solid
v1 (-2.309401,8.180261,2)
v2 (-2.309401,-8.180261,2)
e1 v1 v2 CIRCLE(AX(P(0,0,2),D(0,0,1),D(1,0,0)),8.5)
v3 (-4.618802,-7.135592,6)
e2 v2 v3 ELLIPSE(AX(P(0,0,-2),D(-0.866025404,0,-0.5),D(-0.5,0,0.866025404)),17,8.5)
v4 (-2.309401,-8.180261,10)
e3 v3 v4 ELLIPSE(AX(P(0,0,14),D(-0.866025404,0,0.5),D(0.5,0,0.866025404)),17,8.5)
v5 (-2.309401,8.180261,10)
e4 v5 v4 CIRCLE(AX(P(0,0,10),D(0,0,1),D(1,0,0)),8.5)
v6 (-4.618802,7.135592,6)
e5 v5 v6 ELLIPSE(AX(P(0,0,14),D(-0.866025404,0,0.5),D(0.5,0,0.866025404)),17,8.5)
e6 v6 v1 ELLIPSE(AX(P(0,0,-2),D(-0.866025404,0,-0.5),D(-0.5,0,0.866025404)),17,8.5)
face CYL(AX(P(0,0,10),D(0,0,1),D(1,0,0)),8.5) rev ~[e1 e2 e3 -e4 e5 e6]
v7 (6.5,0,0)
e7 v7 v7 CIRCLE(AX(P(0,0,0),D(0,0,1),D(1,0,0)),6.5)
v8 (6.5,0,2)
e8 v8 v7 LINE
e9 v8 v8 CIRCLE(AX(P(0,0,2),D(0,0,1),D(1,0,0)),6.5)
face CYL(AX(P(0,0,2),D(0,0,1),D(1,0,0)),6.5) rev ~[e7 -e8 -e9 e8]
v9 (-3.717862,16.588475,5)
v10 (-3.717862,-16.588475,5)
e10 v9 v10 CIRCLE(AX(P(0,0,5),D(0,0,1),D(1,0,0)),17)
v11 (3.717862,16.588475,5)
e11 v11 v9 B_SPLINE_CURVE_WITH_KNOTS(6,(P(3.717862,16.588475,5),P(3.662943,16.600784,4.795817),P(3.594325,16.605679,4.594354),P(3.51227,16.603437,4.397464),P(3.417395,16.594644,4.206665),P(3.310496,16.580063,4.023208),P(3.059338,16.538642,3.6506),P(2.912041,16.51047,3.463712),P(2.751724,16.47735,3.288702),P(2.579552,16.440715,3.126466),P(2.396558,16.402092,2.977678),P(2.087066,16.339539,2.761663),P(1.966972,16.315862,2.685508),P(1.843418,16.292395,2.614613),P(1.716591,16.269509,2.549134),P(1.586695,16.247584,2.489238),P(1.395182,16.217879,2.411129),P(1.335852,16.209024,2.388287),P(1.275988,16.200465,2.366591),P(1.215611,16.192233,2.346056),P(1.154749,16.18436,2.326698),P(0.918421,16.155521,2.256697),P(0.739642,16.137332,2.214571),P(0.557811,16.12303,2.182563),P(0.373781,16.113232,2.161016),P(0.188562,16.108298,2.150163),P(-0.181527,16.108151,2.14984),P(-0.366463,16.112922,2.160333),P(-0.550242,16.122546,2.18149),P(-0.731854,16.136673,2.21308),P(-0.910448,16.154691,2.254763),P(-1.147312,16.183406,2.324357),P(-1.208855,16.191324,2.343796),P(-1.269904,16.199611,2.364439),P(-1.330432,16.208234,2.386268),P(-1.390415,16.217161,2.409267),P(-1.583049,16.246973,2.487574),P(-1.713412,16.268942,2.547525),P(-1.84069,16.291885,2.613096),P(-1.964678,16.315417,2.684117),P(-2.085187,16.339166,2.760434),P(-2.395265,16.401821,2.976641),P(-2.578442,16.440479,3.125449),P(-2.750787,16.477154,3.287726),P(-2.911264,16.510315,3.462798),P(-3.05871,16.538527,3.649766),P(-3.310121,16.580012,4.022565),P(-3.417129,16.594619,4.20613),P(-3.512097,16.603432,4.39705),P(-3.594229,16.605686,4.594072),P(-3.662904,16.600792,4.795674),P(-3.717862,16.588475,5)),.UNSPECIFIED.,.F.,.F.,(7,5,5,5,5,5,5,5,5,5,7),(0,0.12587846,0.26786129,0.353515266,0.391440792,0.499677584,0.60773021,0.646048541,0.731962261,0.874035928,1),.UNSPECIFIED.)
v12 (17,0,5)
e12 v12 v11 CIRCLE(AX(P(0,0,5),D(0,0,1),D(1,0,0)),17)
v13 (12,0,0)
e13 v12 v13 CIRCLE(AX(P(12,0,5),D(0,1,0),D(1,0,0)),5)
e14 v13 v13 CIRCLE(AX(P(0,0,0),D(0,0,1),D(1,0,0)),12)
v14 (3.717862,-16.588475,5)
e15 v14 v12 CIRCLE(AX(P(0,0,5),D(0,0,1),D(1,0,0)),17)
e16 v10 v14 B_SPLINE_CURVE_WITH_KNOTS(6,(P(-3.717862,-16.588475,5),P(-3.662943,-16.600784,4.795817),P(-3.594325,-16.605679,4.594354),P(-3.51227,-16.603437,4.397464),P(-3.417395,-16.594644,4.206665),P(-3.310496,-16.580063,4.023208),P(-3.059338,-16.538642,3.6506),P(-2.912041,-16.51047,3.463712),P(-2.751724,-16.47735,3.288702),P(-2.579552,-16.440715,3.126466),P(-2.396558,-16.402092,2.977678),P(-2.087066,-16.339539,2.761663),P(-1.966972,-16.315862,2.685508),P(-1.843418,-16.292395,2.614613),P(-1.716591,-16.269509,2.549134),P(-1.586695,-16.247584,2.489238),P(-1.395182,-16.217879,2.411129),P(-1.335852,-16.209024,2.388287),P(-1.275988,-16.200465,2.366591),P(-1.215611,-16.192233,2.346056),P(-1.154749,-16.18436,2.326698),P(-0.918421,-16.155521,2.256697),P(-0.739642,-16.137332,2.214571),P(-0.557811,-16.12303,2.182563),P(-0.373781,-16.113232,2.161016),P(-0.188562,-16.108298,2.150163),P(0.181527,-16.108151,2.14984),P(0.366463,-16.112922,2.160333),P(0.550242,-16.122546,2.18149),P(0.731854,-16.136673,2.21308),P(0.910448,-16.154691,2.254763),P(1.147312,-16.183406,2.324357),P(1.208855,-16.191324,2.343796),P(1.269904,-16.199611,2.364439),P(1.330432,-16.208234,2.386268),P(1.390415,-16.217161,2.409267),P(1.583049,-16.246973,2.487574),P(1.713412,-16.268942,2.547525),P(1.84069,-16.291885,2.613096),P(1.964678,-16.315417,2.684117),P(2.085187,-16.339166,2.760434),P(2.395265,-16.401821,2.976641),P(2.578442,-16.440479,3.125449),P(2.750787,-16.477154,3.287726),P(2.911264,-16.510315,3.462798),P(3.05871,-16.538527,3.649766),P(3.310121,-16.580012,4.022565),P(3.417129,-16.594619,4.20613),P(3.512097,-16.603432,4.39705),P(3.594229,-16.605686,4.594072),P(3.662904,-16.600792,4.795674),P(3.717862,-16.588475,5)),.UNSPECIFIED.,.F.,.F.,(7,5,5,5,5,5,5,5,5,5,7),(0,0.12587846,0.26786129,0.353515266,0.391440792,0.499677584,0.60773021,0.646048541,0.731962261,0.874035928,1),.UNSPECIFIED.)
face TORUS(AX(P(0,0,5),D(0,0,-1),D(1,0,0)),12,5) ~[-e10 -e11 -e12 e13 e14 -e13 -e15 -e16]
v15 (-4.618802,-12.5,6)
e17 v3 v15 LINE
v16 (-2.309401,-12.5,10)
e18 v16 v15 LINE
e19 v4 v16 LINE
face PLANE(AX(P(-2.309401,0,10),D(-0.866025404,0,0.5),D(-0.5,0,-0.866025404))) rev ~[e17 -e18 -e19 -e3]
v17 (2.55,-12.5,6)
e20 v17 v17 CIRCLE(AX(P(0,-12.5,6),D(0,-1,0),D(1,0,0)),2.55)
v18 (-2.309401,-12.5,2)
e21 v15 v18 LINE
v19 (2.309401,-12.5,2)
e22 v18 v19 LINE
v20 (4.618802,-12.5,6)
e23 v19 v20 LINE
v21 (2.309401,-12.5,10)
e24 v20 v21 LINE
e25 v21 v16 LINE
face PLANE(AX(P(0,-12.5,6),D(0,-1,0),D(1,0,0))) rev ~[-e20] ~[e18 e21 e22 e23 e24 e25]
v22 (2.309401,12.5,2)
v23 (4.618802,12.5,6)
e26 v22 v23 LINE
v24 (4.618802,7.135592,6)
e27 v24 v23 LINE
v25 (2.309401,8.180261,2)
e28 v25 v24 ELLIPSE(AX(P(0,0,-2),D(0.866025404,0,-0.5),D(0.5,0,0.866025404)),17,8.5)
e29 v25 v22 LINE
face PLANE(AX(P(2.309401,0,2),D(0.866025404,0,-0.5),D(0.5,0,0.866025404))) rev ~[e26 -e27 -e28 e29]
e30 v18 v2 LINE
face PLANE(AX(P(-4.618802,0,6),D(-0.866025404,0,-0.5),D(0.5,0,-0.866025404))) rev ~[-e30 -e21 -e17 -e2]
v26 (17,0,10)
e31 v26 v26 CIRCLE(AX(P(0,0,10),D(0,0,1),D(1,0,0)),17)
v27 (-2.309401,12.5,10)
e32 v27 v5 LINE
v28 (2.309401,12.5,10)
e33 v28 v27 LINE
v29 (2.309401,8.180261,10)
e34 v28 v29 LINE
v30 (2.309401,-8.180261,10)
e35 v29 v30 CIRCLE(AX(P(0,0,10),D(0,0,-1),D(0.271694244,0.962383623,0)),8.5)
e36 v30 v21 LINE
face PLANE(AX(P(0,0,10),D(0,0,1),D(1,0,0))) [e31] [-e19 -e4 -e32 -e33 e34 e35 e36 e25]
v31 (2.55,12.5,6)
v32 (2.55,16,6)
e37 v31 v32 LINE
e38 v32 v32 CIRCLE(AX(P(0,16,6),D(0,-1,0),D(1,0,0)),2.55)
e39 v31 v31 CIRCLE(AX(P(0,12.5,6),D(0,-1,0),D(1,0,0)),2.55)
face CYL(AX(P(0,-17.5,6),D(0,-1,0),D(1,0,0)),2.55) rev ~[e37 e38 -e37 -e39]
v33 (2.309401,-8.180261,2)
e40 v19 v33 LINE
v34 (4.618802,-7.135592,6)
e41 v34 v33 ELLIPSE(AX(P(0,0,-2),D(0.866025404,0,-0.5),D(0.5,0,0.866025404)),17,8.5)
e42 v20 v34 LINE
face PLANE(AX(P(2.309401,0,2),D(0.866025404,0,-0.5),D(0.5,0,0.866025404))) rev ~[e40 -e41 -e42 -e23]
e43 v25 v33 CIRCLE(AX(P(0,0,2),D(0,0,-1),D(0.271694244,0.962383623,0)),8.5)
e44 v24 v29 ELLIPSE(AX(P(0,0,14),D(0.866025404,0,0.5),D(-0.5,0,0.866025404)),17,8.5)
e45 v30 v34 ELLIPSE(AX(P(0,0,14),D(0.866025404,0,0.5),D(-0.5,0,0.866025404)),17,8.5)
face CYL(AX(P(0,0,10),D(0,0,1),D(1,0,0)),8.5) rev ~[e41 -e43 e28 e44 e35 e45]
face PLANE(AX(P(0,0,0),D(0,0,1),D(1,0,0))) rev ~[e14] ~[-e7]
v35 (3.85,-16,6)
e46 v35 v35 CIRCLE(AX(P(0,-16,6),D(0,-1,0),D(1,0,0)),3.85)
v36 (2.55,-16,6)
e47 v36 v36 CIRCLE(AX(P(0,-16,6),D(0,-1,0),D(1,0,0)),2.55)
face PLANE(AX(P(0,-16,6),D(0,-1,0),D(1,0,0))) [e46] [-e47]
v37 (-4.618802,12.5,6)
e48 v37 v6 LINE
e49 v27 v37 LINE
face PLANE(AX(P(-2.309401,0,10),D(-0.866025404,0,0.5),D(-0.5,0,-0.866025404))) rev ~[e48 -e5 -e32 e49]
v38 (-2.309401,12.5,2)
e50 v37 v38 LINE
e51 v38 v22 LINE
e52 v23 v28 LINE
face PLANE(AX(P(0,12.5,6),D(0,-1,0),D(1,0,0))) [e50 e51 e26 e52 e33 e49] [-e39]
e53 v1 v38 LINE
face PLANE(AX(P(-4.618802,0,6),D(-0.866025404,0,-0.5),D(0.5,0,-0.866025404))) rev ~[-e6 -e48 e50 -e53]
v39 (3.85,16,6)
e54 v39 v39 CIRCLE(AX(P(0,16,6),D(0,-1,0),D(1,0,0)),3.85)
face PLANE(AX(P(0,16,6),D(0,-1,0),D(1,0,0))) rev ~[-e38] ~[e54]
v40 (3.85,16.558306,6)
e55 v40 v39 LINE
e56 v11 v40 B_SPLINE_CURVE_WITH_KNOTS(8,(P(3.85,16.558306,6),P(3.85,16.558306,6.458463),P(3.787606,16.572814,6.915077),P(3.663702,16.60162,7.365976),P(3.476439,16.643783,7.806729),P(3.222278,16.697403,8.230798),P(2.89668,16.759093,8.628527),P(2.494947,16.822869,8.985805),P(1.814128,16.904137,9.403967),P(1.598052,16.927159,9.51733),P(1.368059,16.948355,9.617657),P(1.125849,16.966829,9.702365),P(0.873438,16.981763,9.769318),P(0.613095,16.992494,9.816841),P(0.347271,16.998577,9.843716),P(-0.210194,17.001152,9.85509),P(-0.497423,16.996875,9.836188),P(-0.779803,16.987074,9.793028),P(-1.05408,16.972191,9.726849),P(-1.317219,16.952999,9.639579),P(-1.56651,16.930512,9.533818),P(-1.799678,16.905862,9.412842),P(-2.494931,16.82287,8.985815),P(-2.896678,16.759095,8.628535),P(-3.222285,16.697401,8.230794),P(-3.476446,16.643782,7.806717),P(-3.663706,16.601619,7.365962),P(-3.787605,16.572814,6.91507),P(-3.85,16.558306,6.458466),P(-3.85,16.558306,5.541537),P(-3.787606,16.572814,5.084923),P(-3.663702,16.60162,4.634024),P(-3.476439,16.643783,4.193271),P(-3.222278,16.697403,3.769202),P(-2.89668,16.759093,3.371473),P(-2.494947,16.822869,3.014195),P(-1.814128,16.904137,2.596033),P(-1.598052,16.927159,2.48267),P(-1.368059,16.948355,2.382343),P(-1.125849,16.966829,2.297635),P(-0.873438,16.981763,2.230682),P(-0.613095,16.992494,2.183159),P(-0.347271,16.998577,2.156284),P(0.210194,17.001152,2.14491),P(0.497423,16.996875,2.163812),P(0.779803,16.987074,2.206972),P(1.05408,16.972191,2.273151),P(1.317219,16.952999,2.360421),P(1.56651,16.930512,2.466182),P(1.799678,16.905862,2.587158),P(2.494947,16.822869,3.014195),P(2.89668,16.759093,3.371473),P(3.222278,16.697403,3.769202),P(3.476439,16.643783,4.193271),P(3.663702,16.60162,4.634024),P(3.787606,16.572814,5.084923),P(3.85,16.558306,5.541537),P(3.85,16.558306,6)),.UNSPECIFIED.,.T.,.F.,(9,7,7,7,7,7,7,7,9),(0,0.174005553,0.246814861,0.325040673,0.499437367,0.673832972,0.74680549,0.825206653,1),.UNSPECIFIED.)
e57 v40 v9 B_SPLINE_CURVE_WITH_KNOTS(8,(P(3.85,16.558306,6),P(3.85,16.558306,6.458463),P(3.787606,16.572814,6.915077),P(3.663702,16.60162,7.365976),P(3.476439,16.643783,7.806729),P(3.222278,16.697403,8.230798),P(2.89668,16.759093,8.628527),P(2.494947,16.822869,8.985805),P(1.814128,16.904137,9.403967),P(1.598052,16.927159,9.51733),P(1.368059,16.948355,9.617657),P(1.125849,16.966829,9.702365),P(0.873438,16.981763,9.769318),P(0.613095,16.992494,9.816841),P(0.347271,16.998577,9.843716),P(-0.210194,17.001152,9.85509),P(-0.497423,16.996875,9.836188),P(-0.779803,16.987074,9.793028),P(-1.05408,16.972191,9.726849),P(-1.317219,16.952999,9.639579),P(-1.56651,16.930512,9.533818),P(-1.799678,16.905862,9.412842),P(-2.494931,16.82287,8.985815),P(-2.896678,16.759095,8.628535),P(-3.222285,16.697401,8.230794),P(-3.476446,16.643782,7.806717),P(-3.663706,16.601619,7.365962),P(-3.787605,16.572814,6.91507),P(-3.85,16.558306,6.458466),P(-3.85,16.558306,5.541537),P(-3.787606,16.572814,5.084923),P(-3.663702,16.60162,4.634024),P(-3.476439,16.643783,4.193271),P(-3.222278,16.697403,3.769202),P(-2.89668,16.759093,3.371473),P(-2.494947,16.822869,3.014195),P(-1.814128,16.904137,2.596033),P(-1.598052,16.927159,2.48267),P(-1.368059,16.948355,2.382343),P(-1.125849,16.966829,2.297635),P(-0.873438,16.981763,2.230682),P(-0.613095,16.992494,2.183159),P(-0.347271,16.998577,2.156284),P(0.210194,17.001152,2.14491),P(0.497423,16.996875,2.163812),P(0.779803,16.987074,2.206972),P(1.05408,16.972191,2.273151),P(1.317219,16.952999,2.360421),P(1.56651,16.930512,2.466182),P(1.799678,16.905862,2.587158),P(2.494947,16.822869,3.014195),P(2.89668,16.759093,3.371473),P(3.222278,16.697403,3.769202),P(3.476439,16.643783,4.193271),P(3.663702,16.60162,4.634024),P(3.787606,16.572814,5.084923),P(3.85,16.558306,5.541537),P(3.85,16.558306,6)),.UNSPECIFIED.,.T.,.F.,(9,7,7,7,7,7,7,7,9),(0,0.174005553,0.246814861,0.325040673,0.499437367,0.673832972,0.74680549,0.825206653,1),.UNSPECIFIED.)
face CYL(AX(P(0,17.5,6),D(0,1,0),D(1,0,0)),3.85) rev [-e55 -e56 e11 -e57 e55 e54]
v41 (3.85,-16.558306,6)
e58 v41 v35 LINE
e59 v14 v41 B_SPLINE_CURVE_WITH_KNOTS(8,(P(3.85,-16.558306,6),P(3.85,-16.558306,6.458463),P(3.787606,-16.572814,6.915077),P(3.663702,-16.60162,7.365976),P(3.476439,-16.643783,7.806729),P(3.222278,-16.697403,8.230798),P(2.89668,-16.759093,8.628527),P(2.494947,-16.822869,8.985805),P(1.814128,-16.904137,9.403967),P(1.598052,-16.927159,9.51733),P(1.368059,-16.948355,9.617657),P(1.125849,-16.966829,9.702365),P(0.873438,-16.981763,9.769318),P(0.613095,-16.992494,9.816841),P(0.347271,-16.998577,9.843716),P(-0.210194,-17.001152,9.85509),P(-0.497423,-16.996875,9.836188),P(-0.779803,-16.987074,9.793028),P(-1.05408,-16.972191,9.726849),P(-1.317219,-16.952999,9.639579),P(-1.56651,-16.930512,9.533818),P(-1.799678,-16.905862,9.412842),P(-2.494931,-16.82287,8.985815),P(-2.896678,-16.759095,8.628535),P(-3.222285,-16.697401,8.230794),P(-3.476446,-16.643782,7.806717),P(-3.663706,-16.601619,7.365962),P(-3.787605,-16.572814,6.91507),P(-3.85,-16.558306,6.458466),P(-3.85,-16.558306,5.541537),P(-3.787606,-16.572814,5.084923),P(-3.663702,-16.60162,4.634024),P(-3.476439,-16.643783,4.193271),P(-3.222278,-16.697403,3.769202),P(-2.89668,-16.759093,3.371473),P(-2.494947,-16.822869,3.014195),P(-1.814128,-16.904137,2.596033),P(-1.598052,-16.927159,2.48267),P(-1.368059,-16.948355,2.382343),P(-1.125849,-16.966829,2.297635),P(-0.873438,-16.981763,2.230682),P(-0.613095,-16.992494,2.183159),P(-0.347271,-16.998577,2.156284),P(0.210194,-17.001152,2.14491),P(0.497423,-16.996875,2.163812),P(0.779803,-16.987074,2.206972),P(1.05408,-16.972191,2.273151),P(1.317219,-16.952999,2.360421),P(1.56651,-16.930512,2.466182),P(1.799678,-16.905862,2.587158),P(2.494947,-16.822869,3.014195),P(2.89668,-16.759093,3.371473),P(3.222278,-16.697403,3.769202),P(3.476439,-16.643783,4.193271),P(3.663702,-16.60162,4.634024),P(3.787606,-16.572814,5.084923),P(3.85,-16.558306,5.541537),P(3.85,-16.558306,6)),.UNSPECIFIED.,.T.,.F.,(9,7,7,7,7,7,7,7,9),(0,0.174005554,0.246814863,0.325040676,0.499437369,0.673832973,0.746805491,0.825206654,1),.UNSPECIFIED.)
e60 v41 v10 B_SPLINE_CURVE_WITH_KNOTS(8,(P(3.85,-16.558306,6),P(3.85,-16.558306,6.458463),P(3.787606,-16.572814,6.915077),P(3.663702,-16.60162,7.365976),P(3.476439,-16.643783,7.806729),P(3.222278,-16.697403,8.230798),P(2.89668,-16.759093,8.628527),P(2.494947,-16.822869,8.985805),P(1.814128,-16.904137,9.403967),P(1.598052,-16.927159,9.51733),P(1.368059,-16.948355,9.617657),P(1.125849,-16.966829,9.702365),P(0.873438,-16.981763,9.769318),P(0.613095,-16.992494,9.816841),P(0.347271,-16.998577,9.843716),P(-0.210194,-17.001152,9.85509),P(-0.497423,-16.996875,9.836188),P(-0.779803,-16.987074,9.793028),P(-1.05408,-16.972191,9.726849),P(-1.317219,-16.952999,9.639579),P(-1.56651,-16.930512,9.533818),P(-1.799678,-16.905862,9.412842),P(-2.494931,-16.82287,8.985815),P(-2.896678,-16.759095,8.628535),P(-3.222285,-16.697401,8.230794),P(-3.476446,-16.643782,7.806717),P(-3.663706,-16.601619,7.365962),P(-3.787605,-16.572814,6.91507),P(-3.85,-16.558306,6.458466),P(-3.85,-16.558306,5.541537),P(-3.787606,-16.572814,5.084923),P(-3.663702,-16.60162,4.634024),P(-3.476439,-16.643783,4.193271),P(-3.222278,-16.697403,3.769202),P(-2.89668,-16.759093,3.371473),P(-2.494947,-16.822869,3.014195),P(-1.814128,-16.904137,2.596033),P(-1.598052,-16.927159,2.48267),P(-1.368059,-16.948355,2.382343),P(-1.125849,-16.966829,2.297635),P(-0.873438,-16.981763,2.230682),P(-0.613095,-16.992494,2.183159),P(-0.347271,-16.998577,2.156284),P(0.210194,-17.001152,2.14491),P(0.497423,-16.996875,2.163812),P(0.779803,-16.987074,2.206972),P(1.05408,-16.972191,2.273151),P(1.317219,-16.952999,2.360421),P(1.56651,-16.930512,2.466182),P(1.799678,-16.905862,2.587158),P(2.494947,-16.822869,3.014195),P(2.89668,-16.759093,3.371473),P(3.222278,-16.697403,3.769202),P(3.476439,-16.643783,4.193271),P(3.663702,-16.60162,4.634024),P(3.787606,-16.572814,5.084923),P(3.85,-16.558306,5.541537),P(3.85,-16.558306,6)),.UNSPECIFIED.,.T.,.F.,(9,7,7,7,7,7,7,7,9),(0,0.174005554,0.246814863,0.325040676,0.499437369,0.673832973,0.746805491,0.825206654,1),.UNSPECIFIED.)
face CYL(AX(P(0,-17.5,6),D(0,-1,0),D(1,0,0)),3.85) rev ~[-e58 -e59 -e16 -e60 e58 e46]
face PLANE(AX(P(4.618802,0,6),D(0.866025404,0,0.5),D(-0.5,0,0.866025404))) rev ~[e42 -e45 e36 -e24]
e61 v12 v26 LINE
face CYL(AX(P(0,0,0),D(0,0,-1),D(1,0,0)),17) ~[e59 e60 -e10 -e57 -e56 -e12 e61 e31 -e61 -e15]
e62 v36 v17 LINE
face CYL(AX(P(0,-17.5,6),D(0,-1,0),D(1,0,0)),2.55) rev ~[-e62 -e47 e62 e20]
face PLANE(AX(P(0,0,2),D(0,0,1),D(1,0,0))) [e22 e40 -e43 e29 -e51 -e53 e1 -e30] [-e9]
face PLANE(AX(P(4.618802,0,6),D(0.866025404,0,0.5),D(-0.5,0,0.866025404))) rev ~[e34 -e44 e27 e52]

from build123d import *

# Parameters (mm, degrees)
F0_R      = 17
F1_DEPTH  = 10
F2_R      = 8.5
F3_DEPTH  = 8
F4_R      = 6.5
F5_DEPTH  = 2.001
F7_DEPTH  = 12.5
F10_R     = 3.85
F11_DEPTH = 1.5
F12_R     = 3.85
F13_DEPTH = 1.5
F15_R     = 2.55
F16_DEPTH = 34.5010001


# Not quite as in the source:
# - a fillet or chamfer that OpenCascade refuses, or shapes differently, is made with other operations: its cross-section is extruded or revolved along the edge and cut away or added


with BuildPart() as f1:
    # F0 (on Top) → F1 (new body)
    with BuildSketch(Plane.XY):
        Circle(F0_R)
    extrude(amount=F1_DEPTH)

    # F2 (on face) → F3 (cut)
    with BuildSketch(Plane.XY.offset(10)):
        Circle(F2_R)
    extrude(amount=-F3_DEPTH, mode=Mode.SUBTRACT)

    # F4 (on face) → F5 (cut, through all)
    with BuildSketch(Plane.XY.offset(2)):
        Circle(F4_R)
    extrude(amount=-F5_DEPTH, mode=Mode.SUBTRACT)

    # F6 (on Front) → F7 (cut, symmetric)
    with BuildSketch(Plane.XZ):
        Polygon((4.6188021535, 6), (2.3094010768, 10), (-2.3094010768, 10), (-4.6188021535, 6), (-2.3094010768, 2), (2.3094010768, 2), align=None)
    extrude(amount=F7_DEPTH, both=True, mode=Mode.SUBTRACT)

    # F10 (on offset) → F11 (cut)
    with BuildSketch(Plane.XZ.offset(17.5)):
        with Locations((0, 6)):
            Circle(F10_R)
    extrude(amount=-F11_DEPTH, mode=Mode.SUBTRACT)

    # F12 (on offset) → F13 (cut)
    with BuildSketch(Plane.XZ.offset(-17.5)):
        with Locations((0, 6)):
            Circle(F12_R)
    extrude(amount=F13_DEPTH, mode=Mode.SUBTRACT)

    # F14: fillet of radius 5 on 1 edges, made by hand

    # F14_s1 → F14_t2 (revolve, cut)
    with BuildSketch(Plane.XZ):
        with BuildLine():
            ThreePointArc((17, 5), (15.5355339059, 1.4644660941), (12, 0))
            Line((12, 0), (17, 0))
            Line((17, 0), (17, 5))
        make_face()
    revolve(axis=Axis((0, 0, 0), (0, 0, 1)), mode=Mode.SUBTRACT)

    # F15 (on offset) → F16 (cut, through all)
    with BuildSketch(Plane.XZ.offset(17.5)):
        with Locations((0, 6)):
            Circle(F15_R)
    extrude(amount=-F16_DEPTH, mode=Mode.SUBTRACT)


solid = f1.part
